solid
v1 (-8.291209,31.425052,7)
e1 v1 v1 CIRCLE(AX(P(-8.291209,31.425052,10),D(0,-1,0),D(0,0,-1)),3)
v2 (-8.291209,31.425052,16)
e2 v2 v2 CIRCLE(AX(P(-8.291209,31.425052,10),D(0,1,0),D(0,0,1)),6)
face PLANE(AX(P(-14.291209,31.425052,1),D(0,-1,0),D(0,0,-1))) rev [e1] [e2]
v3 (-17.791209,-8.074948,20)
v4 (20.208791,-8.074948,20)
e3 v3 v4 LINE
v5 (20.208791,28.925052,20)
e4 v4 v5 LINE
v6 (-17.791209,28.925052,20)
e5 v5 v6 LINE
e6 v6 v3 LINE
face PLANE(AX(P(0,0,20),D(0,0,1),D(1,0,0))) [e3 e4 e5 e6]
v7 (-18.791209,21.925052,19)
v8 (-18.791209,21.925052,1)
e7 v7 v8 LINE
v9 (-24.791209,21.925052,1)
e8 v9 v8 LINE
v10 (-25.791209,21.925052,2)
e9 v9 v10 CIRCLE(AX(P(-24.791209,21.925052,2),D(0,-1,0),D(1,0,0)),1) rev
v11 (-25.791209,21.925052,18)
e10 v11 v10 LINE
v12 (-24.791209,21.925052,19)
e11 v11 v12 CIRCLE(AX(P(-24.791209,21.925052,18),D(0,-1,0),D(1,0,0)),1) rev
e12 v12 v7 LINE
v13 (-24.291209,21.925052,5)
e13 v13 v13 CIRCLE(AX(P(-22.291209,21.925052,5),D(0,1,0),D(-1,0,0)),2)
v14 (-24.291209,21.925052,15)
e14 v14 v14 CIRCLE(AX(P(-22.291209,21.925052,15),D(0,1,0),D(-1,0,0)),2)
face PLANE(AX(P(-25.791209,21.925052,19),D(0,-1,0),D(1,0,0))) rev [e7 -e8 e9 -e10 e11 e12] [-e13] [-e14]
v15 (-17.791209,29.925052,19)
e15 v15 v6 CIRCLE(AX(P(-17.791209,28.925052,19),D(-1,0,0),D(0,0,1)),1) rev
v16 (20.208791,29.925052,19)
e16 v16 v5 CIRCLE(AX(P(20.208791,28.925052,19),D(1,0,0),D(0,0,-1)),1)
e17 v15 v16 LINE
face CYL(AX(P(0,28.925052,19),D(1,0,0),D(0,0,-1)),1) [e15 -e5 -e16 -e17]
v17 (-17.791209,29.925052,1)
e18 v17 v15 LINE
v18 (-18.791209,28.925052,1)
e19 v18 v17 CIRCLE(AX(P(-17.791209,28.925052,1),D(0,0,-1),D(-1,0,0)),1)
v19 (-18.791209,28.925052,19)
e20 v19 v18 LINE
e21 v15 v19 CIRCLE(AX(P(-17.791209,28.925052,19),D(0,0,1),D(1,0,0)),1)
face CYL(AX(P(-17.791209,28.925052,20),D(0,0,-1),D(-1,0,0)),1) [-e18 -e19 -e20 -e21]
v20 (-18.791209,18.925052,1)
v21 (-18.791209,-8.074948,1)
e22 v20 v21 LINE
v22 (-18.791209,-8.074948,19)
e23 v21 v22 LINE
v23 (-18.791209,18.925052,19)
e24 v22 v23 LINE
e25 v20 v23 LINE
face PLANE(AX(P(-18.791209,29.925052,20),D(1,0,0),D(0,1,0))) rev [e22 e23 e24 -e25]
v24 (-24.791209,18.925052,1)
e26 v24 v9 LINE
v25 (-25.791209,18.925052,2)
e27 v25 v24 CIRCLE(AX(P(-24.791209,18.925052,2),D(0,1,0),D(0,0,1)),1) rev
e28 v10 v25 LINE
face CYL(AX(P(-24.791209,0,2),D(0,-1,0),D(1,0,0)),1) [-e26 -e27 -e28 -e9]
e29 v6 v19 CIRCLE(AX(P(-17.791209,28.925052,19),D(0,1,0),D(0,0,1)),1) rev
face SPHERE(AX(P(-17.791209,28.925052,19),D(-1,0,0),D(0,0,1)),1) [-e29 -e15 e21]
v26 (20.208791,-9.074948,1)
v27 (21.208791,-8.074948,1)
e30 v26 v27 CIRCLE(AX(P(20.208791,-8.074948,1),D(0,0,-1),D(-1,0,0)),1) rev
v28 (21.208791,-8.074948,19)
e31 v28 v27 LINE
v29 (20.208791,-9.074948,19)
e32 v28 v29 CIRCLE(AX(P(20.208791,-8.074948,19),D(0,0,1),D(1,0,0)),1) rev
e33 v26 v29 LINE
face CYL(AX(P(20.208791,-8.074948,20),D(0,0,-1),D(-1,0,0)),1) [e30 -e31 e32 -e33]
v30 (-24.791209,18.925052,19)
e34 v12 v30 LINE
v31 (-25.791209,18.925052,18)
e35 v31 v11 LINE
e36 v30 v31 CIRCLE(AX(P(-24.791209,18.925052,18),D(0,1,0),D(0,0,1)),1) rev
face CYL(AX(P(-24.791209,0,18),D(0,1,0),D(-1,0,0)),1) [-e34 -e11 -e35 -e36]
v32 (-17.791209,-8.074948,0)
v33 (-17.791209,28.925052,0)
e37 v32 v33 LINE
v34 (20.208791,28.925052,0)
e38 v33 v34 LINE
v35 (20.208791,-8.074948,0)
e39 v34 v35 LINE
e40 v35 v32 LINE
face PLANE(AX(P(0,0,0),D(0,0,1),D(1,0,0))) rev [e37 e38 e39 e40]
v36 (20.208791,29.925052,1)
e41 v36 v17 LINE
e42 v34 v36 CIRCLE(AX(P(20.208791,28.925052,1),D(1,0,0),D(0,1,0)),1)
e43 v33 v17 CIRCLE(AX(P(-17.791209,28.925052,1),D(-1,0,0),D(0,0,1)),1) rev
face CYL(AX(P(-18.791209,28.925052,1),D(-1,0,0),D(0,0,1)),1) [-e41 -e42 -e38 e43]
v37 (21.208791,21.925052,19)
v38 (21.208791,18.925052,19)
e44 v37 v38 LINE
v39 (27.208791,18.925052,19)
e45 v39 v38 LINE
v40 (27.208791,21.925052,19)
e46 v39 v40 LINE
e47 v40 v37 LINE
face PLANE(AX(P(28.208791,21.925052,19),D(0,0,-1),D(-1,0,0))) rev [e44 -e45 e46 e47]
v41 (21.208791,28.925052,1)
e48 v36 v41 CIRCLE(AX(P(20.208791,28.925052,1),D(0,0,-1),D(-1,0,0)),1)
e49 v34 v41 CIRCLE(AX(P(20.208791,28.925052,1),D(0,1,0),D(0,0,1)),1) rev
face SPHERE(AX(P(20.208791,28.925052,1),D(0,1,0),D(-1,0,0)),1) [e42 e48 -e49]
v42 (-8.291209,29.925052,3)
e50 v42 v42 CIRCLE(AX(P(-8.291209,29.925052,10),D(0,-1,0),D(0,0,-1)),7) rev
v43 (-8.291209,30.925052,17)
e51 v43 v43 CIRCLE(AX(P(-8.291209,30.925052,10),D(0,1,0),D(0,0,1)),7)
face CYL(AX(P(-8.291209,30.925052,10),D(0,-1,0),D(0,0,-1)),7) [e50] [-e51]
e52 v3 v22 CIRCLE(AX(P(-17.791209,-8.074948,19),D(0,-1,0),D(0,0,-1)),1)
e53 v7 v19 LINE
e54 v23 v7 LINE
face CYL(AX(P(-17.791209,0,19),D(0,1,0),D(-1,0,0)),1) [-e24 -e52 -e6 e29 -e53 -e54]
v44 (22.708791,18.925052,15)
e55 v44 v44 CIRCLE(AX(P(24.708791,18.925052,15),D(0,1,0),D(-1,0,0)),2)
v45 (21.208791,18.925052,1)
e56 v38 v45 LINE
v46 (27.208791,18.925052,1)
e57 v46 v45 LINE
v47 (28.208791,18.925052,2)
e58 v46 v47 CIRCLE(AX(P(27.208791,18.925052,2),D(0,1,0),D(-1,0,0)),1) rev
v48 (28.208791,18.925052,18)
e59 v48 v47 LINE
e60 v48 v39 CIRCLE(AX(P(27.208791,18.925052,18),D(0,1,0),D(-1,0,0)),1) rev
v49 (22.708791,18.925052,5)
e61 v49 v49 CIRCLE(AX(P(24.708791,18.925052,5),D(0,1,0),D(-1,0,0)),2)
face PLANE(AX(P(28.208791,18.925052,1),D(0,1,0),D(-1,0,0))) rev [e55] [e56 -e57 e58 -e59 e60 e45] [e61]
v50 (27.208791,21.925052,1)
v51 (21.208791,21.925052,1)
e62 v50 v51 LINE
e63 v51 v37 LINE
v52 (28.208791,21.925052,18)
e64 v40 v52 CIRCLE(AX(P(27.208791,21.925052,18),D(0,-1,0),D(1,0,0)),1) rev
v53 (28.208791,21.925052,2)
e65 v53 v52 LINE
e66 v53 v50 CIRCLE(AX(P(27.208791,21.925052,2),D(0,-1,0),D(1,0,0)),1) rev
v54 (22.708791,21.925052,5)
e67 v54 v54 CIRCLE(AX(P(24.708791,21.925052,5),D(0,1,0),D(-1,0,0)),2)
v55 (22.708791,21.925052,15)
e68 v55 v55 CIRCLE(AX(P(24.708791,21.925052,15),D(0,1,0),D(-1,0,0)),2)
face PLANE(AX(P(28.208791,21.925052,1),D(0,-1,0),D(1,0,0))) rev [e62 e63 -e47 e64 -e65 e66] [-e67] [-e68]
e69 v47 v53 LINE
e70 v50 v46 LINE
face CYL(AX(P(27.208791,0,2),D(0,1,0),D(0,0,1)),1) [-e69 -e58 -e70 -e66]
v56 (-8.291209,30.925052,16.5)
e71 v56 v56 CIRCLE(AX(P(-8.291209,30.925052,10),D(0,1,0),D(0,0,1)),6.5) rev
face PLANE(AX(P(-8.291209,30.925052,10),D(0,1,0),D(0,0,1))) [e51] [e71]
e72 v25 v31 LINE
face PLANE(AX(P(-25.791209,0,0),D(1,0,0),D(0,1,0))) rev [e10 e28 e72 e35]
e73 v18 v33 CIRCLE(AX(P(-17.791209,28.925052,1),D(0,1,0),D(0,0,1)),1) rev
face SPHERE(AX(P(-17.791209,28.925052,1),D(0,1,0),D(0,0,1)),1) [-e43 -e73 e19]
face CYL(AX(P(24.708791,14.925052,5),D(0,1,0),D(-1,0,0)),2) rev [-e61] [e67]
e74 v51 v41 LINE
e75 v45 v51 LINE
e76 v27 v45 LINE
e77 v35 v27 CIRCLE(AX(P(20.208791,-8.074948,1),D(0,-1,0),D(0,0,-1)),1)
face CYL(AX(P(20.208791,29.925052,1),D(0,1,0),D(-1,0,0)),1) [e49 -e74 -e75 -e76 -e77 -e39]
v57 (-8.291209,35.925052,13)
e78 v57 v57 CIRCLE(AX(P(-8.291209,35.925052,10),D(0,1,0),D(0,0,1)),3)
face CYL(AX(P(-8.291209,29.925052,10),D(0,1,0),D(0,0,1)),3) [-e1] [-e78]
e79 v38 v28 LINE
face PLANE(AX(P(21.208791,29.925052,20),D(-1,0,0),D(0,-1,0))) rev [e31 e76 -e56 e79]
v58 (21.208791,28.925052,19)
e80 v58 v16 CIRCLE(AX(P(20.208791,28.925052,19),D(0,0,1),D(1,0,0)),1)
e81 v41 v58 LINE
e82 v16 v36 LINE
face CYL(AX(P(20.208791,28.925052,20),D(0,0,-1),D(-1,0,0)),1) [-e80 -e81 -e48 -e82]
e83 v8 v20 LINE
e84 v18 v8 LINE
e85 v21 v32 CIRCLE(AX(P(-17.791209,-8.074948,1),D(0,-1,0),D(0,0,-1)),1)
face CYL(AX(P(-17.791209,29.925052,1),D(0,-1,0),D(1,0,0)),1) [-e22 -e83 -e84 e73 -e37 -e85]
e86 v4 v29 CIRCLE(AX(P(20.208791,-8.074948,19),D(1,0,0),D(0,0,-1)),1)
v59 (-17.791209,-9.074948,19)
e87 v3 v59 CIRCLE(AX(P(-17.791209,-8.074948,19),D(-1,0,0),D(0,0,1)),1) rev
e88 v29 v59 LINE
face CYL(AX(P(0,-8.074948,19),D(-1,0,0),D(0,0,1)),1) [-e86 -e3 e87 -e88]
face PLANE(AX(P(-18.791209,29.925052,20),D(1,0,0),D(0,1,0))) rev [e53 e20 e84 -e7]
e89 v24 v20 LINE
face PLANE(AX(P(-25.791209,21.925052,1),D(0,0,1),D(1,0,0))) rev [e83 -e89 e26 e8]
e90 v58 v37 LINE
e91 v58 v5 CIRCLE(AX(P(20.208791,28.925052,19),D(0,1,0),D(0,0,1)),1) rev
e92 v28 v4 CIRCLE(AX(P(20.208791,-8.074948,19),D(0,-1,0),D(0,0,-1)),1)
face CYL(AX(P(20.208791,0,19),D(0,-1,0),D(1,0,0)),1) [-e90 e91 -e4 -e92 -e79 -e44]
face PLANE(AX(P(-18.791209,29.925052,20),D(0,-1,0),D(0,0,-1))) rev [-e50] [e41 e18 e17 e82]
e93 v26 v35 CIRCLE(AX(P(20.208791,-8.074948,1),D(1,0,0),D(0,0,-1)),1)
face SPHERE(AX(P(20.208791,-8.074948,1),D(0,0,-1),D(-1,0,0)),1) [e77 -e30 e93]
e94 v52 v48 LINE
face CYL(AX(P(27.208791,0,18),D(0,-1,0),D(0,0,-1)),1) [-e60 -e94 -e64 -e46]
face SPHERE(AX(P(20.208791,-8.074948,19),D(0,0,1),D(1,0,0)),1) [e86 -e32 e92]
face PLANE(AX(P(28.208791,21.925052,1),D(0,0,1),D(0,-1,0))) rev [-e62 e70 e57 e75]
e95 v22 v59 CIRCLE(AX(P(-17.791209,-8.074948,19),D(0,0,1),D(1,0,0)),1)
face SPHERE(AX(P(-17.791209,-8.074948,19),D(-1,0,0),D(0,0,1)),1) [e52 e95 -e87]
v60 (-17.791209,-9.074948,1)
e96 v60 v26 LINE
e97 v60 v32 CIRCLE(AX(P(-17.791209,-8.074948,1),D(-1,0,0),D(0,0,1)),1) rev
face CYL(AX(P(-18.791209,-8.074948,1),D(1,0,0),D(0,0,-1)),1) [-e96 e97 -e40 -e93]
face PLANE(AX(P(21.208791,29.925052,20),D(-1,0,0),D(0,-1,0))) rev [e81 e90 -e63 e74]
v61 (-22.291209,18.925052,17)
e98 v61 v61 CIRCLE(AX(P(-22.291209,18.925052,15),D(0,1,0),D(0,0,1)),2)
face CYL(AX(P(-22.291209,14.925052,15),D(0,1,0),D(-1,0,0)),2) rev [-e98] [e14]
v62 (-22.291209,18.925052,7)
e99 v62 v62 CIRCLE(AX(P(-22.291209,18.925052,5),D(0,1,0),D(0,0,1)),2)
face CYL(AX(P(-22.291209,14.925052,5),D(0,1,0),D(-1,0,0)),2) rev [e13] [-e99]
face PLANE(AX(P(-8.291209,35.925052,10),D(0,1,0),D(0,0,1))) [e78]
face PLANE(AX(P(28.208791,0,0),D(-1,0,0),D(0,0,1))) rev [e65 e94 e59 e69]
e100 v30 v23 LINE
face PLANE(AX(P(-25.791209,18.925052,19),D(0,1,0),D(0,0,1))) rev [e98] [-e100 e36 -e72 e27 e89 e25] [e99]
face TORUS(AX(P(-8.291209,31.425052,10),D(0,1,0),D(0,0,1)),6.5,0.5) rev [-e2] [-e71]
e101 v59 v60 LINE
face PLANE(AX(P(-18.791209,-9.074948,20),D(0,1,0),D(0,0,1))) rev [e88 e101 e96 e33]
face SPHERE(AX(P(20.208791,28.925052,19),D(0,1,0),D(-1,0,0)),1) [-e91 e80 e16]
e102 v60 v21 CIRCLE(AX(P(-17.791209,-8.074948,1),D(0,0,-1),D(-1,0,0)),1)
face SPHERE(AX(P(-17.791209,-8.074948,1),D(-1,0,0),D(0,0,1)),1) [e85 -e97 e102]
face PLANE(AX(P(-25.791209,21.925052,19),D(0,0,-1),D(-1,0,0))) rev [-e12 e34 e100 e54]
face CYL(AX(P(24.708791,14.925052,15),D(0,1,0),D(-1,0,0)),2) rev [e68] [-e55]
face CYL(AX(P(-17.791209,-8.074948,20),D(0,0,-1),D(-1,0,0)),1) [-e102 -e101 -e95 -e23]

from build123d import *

# Parameters (mm, degrees)
SKETCH_1_W          = 40
SKETCH_1_H          = 39
EXTRUDE_1_DEPTH     = 20
FILLET_1_R          = 1
SKETCH_2_W          = 18
SKETCH_2_H          = 3
EXTRUDE_2_DEPTH     = 7
SKETCH_3_W          = 18
SKETCH_3_H          = 3
EXTRUDE_3_DEPTH     = 7
FILLET_8_R          = 1
FILLET_9_R          = 1
SKETCH_4_R          = 2
CUT_EXTRUDE_1_DEPTH = 7
SKETCH_5_R          = 2
CUT_EXTRUDE_2_DEPTH = 7
SKETCH_6_R          = 2
CUT_EXTRUDE_3_DEPTH = 7
SKETCH_8_R          = 2
CUT_EXTRUDE_4_DEPTH = 7
SKETCH_9_R          = 3
EXTRUDE_4_DEPTH     = 6
SKETCH_10_R         = 7
EXTRUDE_5_DEPTH     = 1
SKETCH_11_R         = 6
EXTRUDE_6_DEPTH     = 2
FILLET_11_R         = 0.5
SKETCH_12_W         = 12
SKETCH_12_H         = 0.5
CUT_EXTRUDE_6_DEPTH = 19
SKETCH_13_R         = 3
EXTRUDE_7_DEPTH     = 6


with BuildPart() as part:
    # 草图1 → 凸台-拉伸1 (new body)
    with BuildSketch(Plane.XY):
        with Locations((1.208791209, 10.42505216)):
            Rectangle(SKETCH_1_W, SKETCH_1_H)
    extrude(amount=EXTRUDE_1_DEPTH)

    # 圆角1
    fillet_1_edges = [part.edges().sort_by_distance(p)[0] for p in [
        (21.208791209, 10.42505216, 20),
        (1.208791209, 29.92505216, 20),
        (-18.791208791, 10.42505216, 20),
        (1.208791209, 29.92505216, 0),
        (21.208791209, 10.42505216, 0),
        (1.208791209, -9.07494784, 0),
        (-18.791208791, 10.42505216, 0),
        (-18.791208791, 29.92505216, 10),
        (21.208791209, 29.92505216, 10),
        (21.208791209, -9.07494784, 10),
        (-18.791208791, -9.07494784, 10),
        (1.208791209, -9.07494784, 20),
    ]]
    fillet(fillet_1_edges, radius=FILLET_1_R)

    # 草图2 → 凸台-拉伸2 (add)
    with BuildSketch(Plane.ZY.offset(18.791208791)):
        with Locations((10, 20.42505216)):
            Rectangle(SKETCH_2_W, SKETCH_2_H)
    extrude(amount=EXTRUDE_2_DEPTH)

    # 草图3 → 凸台-拉伸3 (add)
    with BuildSketch(Plane(origin=(21.208791209, 0, 0), x_dir=(0, 0, -1), z_dir=(1, 0, 0))):
        with Locations((-10, 20.42505216)):
            Rectangle(SKETCH_3_W, SKETCH_3_H)
    extrude(amount=EXTRUDE_3_DEPTH)

    # 圆角8
    fillet_8_edges = [part.edges().sort_by_distance(p)[0] for p in [
        (28.208791209, 20.42505216, 1),
    ]]
    fillet(fillet_8_edges, radius=FILLET_8_R)

    # 圆角9
    fillet_9_edges = [part.edges().sort_by_distance(p)[0] for p in [
        (-25.791208791, 20.42505216, 19),
        (-25.791208791, 20.42505216, 1),
        (28.208791209, 20.42505216, 19),
    ]]
    fillet(fillet_9_edges, radius=FILLET_9_R)

    # 草图4 → 切除-拉伸1 (cut)
    with BuildSketch(Plane(origin=(0, 21.92505216, 0), x_dir=(1, 0, 0), z_dir=(0, 1, 0))):
        with Locations(Location((-22.291208791, -5, 0), (0, 0, 180))):
            Circle(SKETCH_4_R)
    extrude(amount=-CUT_EXTRUDE_1_DEPTH, mode=Mode.SUBTRACT)

    # 草图5 → 切除-拉伸2 (cut)
    with BuildSketch(Plane(origin=(0, 21.92505216, 0), x_dir=(1, 0, 0), z_dir=(0, 1, 0))):
        with Locations(Location((-22.291208791, -15, 0), (0, 0, 180))):
            Circle(SKETCH_5_R)
    extrude(amount=-CUT_EXTRUDE_2_DEPTH, mode=Mode.SUBTRACT)

    # 草图6 → 切除-拉伸3 (cut)
    with BuildSketch(Plane(origin=(0, 21.92505216, 0), x_dir=(1, 0, 0), z_dir=(0, 1, 0))):
        with Locations(Location((24.708791209, -5, 0), (0, 0, 180))):
            Circle(SKETCH_6_R)
    extrude(amount=-CUT_EXTRUDE_3_DEPTH, mode=Mode.SUBTRACT)

    # 草图8 → 切除-拉伸4 (cut)
    with BuildSketch(Plane(origin=(0, 21.92505216, 0), x_dir=(1, 0, 0), z_dir=(0, 1, 0))):
        with Locations(Location((24.708791209, -15, 0), (0, 0, 180))):
            Circle(SKETCH_8_R)
    extrude(amount=-CUT_EXTRUDE_4_DEPTH, mode=Mode.SUBTRACT)

    # 草图9 → 凸台-拉伸4 (add)
    with BuildSketch(Plane(origin=(0, 29.92505216, 0), x_dir=(1, 0, 0), z_dir=(0, 1, 0))):
        with Locations(Location((-8.291208791, -10, 0), (0, 0, 90))):
            Circle(SKETCH_9_R)
    extrude(amount=EXTRUDE_4_DEPTH)

    # 草图10 → 凸台-拉伸5 (add)
    with BuildSketch(Plane(origin=(0, 29.92505216, 0), x_dir=(1, 0, 0), z_dir=(0, 1, 0))):
        with Locations(Location((-8.291208791, -10, 0), (0, 0, 90))):
            Circle(SKETCH_10_R)
    extrude(amount=EXTRUDE_5_DEPTH)

    # 草图11 → 凸台-拉伸6 (add)
    with BuildSketch(Plane(origin=(0, 29.92505216, 0), x_dir=(1, 0, 0), z_dir=(0, 1, 0))):
        with Locations(Location((-8.291208791, -10, 0), (0, 0, 270))):
            Circle(SKETCH_11_R)
    extrude(amount=EXTRUDE_6_DEPTH)

    # 圆角11
    fillet_11_edges = [part.edges().sort_by_distance(p)[0] for p in [
        (-8.291208791, 30.92505216, 4),
        (-8.291208791, 31.92505216, 4),
    ]]
    fillet(fillet_11_edges, radius=FILLET_11_R - 0.0001)  # a hair under: the kernel refuses the full size

    # 草图12 → 切除-拉伸6 (cut)
    with BuildSketch(Plane.XY.offset(20)):
        with Locations((-8.291208791, 31.67505216)):
            Rectangle(SKETCH_12_W, SKETCH_12_H)
    extrude(amount=-CUT_EXTRUDE_6_DEPTH, mode=Mode.SUBTRACT)


with BuildPart() as cut_extrude_6_piece_1:
    # of the separate pieces the step leaves, piece 1, a body of its own (cut_extrude_6_pieces)
    add(part.part.solids().sort_by_distance((-8.291208791, 30.92505216, 16.4999))[0])



with BuildPart() as cut_extrude_6_piece_2:
    # of the separate pieces the step leaves, piece 2, a body of its own (cut_extrude_6_pieces)
    add(part.part.solids().sort_by_distance((-8.291208791, 31.92505216, 7))[0])


with BuildPart() as cut_extrude_6_piece_1_1:
    add(cut_extrude_6_piece_1.part)

    add(cut_extrude_6_piece_2.part)  # 凸台-拉伸7 merges 切除-拉伸6 piece 2
    # 草图13 → 凸台-拉伸7 (add)
    with BuildSketch(Plane(origin=(0, 35.92505216, 0), x_dir=(1, 0, 0), z_dir=(0, 1, 0))):
        with Locations(Location((-8.291208791, -10, 0), (0, 0, 270))):
            Circle(SKETCH_13_R)
    extrude(amount=-EXTRUDE_7_DEPTH)


solid = cut_extrude_6_piece_1_1.part
